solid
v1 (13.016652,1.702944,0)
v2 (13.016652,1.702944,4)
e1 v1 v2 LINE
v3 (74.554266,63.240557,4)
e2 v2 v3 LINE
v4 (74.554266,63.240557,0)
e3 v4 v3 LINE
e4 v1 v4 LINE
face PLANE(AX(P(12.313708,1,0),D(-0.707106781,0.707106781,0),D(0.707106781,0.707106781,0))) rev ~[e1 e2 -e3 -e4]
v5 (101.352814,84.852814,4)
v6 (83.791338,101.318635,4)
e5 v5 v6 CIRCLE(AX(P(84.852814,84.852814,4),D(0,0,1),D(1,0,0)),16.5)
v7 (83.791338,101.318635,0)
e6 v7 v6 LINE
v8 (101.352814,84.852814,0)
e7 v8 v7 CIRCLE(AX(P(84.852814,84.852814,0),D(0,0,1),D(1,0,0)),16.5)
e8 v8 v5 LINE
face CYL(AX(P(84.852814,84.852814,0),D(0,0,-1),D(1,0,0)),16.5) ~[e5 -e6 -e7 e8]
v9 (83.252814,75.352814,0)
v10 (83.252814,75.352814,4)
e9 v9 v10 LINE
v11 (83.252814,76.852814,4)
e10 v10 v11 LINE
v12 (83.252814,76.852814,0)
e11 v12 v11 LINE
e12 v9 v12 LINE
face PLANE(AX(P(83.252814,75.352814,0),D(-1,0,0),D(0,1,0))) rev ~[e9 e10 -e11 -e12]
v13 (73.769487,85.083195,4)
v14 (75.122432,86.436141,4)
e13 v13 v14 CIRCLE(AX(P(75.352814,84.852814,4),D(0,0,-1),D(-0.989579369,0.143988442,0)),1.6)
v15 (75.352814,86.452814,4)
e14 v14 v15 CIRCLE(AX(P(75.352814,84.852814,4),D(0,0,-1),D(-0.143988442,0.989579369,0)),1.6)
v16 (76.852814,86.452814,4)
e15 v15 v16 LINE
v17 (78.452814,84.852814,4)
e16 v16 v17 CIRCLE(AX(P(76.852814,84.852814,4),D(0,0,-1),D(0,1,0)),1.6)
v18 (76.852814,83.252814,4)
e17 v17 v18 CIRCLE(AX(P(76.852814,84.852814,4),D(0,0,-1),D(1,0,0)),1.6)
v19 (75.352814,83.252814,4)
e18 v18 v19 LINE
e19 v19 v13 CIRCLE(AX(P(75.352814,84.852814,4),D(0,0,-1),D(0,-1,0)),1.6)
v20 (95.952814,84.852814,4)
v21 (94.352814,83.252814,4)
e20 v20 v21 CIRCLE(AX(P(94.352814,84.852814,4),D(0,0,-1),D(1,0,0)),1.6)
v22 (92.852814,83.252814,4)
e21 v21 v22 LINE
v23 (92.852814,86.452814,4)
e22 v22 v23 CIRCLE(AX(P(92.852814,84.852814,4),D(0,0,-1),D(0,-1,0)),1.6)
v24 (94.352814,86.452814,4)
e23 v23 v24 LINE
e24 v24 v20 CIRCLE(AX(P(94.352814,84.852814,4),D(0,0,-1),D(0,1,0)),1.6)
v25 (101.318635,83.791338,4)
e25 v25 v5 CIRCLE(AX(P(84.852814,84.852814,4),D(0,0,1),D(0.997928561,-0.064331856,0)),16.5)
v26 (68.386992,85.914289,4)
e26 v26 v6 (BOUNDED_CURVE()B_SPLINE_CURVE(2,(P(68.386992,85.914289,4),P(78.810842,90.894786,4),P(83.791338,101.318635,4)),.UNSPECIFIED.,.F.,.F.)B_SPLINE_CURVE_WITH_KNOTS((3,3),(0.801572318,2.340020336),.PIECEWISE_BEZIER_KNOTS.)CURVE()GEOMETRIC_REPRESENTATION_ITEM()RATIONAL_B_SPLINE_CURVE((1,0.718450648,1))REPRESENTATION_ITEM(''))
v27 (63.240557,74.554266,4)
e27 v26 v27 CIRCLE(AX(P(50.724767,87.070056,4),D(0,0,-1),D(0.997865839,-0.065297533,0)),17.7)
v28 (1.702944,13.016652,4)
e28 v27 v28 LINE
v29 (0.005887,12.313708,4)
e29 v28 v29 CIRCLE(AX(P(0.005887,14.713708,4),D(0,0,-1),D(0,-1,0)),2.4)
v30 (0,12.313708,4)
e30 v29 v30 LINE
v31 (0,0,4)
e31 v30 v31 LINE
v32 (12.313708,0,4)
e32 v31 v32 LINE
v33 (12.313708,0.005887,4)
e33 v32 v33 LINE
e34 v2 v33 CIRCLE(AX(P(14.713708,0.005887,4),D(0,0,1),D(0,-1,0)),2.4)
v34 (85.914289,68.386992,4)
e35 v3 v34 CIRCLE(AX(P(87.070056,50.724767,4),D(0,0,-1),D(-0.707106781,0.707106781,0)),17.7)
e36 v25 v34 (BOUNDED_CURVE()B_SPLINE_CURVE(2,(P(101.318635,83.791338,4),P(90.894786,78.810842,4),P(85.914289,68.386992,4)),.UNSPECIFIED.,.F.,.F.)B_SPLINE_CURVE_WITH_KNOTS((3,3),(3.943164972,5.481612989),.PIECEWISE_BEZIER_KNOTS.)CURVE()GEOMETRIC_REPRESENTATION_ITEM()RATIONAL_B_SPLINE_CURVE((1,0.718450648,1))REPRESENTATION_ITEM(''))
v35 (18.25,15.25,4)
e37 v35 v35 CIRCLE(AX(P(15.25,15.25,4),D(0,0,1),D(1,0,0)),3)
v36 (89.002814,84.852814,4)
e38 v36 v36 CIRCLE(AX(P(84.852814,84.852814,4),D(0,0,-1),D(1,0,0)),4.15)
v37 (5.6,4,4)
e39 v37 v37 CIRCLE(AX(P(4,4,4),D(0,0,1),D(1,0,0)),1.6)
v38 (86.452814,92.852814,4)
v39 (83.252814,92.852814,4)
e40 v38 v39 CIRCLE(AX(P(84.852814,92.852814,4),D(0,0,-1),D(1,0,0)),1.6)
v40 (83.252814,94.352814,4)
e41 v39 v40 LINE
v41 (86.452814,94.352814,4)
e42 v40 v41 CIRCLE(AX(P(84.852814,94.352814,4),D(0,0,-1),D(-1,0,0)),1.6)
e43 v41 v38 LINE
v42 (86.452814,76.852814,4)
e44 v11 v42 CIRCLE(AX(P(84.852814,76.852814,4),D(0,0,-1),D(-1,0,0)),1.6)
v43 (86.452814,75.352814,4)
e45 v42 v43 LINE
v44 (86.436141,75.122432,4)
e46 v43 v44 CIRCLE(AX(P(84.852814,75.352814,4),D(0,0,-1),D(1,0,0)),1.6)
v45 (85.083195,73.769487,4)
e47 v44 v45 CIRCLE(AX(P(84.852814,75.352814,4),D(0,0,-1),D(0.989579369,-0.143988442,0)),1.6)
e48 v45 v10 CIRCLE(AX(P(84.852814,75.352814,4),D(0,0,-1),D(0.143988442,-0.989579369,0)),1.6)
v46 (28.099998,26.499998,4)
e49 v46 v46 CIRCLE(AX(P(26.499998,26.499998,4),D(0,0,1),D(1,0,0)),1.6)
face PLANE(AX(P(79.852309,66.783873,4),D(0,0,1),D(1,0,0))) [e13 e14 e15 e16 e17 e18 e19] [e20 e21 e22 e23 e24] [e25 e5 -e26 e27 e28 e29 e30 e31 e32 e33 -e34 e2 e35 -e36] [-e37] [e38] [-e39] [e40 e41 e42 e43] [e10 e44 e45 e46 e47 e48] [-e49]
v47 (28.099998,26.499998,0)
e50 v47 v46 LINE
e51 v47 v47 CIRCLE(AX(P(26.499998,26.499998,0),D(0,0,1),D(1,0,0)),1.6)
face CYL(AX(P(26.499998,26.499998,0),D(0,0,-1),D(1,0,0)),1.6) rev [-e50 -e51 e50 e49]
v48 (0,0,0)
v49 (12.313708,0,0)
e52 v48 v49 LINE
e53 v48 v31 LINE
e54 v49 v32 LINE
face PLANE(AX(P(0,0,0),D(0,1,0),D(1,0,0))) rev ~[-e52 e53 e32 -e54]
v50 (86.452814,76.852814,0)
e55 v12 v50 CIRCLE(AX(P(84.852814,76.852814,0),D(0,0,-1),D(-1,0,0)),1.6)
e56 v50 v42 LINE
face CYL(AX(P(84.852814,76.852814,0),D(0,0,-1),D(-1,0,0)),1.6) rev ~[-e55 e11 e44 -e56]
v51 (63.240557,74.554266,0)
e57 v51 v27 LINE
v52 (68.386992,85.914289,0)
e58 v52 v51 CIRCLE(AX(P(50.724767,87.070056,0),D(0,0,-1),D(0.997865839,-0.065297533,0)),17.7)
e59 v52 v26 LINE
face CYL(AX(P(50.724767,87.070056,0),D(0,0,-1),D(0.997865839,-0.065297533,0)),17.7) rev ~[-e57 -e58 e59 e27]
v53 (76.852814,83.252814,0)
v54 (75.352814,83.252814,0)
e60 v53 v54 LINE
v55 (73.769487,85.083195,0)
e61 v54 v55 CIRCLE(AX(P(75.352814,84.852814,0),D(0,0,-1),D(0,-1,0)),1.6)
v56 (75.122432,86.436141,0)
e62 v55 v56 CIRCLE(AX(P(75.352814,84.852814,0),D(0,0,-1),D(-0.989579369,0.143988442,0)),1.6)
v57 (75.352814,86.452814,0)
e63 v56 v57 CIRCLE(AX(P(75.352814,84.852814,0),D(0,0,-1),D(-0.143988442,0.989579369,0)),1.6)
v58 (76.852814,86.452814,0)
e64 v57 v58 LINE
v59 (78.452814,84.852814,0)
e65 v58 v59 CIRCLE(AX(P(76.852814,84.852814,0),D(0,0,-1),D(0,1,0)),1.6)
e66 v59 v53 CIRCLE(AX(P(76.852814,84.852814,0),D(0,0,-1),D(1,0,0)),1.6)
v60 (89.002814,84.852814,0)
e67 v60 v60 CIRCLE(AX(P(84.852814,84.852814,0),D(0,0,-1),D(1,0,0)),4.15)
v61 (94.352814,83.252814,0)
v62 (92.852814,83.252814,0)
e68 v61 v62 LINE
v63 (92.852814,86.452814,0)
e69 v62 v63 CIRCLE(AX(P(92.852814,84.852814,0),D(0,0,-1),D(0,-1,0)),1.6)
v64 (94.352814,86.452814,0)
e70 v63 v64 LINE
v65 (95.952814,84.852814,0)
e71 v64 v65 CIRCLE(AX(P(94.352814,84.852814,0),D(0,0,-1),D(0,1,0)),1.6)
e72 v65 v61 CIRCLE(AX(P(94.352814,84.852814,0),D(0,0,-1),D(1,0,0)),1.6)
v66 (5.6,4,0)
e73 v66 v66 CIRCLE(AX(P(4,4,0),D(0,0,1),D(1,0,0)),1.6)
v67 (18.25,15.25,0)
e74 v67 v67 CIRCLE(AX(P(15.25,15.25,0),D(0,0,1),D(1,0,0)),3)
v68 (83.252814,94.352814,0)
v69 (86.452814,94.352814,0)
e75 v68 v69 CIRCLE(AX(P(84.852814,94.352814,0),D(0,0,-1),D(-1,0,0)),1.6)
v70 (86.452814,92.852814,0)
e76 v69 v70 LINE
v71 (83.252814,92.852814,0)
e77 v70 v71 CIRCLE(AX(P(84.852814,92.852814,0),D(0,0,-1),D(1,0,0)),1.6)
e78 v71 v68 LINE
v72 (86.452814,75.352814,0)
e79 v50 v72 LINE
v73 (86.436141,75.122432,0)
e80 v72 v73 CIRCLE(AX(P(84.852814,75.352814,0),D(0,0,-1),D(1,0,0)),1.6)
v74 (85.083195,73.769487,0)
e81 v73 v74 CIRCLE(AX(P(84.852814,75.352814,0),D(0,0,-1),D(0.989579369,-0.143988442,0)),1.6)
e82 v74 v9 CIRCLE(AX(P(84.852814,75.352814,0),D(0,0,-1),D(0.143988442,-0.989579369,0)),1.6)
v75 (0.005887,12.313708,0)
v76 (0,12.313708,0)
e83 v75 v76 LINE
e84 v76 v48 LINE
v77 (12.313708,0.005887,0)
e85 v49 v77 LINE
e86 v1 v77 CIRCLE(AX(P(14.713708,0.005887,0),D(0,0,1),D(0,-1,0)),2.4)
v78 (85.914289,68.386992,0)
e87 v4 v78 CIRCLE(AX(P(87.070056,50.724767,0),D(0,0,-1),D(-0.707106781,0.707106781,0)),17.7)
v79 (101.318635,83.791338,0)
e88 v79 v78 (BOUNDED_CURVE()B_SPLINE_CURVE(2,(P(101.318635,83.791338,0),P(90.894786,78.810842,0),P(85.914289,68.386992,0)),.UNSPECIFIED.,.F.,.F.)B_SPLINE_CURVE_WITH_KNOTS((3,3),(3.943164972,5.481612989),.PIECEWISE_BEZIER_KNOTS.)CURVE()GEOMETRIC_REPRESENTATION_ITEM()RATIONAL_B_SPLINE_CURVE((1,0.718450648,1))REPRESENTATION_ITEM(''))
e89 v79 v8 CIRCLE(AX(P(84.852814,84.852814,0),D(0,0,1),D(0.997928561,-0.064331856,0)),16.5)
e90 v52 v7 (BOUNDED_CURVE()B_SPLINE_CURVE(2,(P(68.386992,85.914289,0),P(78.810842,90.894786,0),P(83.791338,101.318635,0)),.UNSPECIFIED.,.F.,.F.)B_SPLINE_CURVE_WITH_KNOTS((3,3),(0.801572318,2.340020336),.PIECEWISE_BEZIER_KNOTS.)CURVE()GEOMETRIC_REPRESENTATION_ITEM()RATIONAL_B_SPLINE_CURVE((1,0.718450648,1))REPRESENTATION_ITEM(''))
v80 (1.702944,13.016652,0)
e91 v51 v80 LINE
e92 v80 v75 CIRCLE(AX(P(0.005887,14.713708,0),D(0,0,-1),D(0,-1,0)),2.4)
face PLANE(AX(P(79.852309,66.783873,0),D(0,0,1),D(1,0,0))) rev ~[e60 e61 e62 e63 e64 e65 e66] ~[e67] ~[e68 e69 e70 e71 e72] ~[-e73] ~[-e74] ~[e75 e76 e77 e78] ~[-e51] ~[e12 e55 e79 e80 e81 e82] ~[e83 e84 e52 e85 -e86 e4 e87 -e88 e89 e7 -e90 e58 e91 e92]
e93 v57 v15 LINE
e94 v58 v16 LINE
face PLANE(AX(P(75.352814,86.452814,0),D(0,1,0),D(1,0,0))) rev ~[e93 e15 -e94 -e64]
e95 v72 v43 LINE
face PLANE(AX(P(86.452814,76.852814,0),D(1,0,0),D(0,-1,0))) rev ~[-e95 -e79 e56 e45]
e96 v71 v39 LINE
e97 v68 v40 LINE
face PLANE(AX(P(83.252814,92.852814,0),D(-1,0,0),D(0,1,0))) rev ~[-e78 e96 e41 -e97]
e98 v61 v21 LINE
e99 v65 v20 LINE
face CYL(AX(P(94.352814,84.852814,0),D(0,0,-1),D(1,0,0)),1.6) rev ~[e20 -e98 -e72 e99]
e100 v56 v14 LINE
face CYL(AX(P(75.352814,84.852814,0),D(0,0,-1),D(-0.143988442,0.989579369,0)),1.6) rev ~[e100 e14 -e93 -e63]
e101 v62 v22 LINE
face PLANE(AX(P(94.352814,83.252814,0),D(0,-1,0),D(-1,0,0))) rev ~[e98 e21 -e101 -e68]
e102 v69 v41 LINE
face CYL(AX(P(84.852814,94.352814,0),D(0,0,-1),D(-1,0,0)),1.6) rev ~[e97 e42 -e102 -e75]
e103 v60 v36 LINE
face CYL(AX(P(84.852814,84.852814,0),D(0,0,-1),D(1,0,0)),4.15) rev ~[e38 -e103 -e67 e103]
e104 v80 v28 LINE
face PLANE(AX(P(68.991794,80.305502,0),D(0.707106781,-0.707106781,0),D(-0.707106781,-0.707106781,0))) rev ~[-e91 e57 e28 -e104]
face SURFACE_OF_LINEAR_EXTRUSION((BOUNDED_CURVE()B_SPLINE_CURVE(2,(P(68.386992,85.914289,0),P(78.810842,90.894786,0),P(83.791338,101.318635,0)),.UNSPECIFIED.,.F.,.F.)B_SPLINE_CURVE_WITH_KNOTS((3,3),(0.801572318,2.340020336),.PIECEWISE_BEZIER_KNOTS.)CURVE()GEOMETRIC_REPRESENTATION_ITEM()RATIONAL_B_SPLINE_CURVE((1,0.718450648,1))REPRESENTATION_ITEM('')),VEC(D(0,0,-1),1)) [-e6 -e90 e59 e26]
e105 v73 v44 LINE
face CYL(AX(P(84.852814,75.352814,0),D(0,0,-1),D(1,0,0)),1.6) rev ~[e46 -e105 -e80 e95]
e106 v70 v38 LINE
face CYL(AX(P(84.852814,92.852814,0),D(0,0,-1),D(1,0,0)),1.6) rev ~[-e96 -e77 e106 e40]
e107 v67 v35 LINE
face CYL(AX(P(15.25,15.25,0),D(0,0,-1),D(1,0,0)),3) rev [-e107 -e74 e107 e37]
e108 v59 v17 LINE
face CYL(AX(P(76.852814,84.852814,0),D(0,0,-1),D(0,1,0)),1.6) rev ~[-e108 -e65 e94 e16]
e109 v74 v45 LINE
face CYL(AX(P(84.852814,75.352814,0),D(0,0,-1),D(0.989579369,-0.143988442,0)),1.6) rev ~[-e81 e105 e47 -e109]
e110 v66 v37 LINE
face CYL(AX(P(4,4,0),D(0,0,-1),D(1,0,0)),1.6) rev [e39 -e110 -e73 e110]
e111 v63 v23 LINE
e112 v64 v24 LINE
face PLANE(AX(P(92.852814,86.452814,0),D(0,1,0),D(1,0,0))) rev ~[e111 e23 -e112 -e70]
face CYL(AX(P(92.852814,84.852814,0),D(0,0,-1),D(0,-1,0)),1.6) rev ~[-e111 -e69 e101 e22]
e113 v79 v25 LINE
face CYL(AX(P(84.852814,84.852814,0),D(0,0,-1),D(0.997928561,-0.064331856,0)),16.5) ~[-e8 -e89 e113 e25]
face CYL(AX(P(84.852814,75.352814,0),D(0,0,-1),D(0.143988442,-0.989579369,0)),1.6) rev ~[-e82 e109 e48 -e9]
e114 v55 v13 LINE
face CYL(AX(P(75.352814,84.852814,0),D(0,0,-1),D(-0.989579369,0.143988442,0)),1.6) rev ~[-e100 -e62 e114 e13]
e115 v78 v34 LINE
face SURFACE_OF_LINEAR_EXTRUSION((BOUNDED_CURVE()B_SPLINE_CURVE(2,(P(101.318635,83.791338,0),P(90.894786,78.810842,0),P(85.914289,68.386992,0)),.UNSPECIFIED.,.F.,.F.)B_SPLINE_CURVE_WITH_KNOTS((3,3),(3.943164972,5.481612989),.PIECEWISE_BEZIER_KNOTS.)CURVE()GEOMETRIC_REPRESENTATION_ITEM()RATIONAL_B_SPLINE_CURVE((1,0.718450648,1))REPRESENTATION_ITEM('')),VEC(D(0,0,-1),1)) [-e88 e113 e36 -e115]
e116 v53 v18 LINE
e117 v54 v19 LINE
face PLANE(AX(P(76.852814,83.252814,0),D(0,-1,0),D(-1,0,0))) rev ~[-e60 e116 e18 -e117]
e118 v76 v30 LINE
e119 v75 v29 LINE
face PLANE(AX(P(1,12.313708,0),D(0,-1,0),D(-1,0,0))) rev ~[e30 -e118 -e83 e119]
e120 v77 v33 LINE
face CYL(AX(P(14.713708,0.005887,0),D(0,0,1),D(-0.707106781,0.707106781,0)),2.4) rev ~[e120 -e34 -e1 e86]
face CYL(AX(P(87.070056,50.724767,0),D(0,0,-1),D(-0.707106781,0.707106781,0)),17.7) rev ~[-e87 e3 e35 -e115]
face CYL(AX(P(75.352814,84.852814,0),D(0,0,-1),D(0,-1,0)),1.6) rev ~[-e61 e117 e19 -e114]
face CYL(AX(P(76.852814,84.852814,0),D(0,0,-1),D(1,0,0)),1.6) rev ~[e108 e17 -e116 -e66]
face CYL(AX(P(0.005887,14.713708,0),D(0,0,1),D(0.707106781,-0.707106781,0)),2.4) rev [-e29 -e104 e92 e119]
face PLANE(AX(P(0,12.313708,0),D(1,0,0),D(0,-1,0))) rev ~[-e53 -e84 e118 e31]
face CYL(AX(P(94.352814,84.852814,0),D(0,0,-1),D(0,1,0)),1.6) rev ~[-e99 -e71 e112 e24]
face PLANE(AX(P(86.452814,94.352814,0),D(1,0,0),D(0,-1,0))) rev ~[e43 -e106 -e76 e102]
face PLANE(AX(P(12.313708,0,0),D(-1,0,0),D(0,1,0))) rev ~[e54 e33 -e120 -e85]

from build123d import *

# Parameters (mm, degrees)
F0_R        = 1.6
F0_R_2      = 3
F1_DEPTH    = 4
F2_T1_DEPTH = 4
F3_R        = 2.4


# Not quite as in the source:
# - a fillet or chamfer that OpenCascade refuses, or shapes differently, is made with other operations: its cross-section is extruded or revolved along the edge and cut away or added


with BuildPart() as f1:
    # F0 (on Top) → F1 (new body)
    with BuildSketch(Plane.XY):
        with BuildLine():
            ThreePointArc((80.3055021759, 68.9917936769), (73.1855518528, 73.1855518528), (68.9917936769, 80.3055021759))
            Line((68.9917936769, 80.3055021759), (1, 12.313708499))
            Line((1, 12.313708499), (0, 11.313708499))
            Line((0, 11.313708499), (0, 0))
            Line((0, 0), (11.313708499, 0))
            Line((11.313708499, 0), (12.313708499, 1))
            Line((12.313708499, 1), (80.3055021759, 68.9917936769))
        make_face()
        with Locations((4, 4)):
            Circle(F0_R, mode=Mode.SUBTRACT)
        with Locations((15.25, 15.25)):
            Circle(F0_R_2, mode=Mode.SUBTRACT)
        with Locations((26.499998178, 26.499998178)):
            Circle(F0_R, mode=Mode.SUBTRACT)
        with BuildLine():
            ThreePointArc((87.7873068843, 81.9183206005), (81.9183206005, 81.9183206005), (81.9183206005, 87.7873068843))
            Line((81.9183206005, 87.7873068843), (79.1959594929, 90.5096679919))
            Line((79.1959594929, 90.5096679919), (75.1224322345, 86.4361407335))
            ThreePointArc((75.1224322345, 86.4361407335), (75.2373217206, 86.4486400465), (75.3528137424, 86.4528137424))
            Line((75.3528137424, 86.4528137424), (76.8528137424, 86.4528137424))
            ThreePointArc((76.8528137424, 86.4528137424), (77.9841845923, 85.9841845923), (78.4528137424, 84.8528137424))
            ThreePointArc((78.4528137424, 84.8528137424), (77.9841845923, 83.7214428925), (76.8528137424, 83.2528137424))
            Line((76.8528137424, 83.2528137424), (75.3528137424, 83.2528137424))
            ThreePointArc((75.3528137424, 83.2528137424), (74.1427289494, 83.8060593329), (73.7694867513, 85.0831952502))
            Line((73.7694867513, 85.0831952502), (68.9917936769, 80.3055021759))
            ThreePointArc((68.9917936769, 80.3055021759), (73.1855518528, 73.1855518528), (80.3055021759, 68.9917936769))
            Line((80.3055021759, 68.9917936769), (85.0831952502, 73.7694867513))
            ThreePointArc((85.0831952502, 73.7694867513), (83.8060593329, 74.1427289494), (83.2528137424, 75.3528137424))
            Line((83.2528137424, 75.3528137424), (83.2528137424, 76.8528137424))
            ThreePointArc((83.2528137424, 76.8528137424), (84.8528137424, 78.4528137424), (86.4528137424, 76.8528137424))
            Line((86.4528137424, 76.8528137424), (86.4528137424, 75.3528137424))
            ThreePointArc((86.4528137424, 75.3528137424), (86.4486400465, 75.2373217206), (86.4361407335, 75.1224322345))
            Line((86.4361407335, 75.1224322345), (90.5096679919, 79.1959594929))
            Line((90.5096679919, 79.1959594929), (87.7873068843, 81.9183206005))
        make_face()
        with BuildLine():
            Line((79.1959594929, 90.5096679919), (81.9183206005, 87.7873068843))
            ThreePointArc((81.9183206005, 87.7873068843), (86.4409499867, 88.6869138023), (89.0028137424, 84.8528137424))
            ThreePointArc((89.0028137424, 84.8528137424), (88.6869138023, 83.2646774981), (87.7873068843, 81.9183206005))
            Line((87.7873068843, 81.9183206005), (90.5096679919, 79.1959594929))
            Line((90.5096679919, 79.1959594929), (86.4361407335, 75.1224322345))
            ThreePointArc((86.4361407335, 75.1224322345), (85.9841845923, 74.2214428925), (85.0831952502, 73.7694867513))
            Line((85.0831952502, 73.7694867513), (80.3055021759, 68.9917936769))
            ThreePointArc((80.3055021759, 68.9917936769), (83.083856654, 68.4479123157), (85.9142893623, 68.3869924902))
            add(Edge.make_bspline(
                [(101.3186349946, 83.7913381225), (90.8947856118, 78.810841873), (85.9142893623, 68.3869924902)],
                knots=[3.9431649716, 3.9431649716, 3.9431649716, 5.4816129892, 5.4816129892, 5.4816129892], degree=2, weights=[1, 0.7184506482, 1]))
            ThreePointArc((101.3186349946, 83.7913381225), (101.3442668418, 84.321800871), (101.3528137424, 84.8528137424))
            ThreePointArc((101.3528137424, 84.8528137424), (96.1385492583, 96.8895148629), (83.7913381225, 101.3186349946))
            add(Edge.make_bspline(
                [(68.3869924902, 85.9142893623), (78.810841873, 90.8947856118), (83.7913381225, 101.3186349946)],
                knots=[0.801572318, 0.801572318, 0.801572318, 2.3400203356, 2.3400203356, 2.3400203356], degree=2, weights=[1, 0.7184506482, 1]))
            ThreePointArc((68.3869924902, 85.9142893623), (68.4479123157, 83.083856654), (68.9917936769, 80.3055021759))
            Line((68.9917936769, 80.3055021759), (73.7694867513, 85.0831952502))
            ThreePointArc((73.7694867513, 85.0831952502), (74.2214428925, 85.9841845923), (75.1224322345, 86.4361407335))
            Line((75.1224322345, 86.4361407335), (79.1959594929, 90.5096679919))
        make_face()
        with BuildLine():
            ThreePointArc((95.9528137424, 84.8528137424), (95.4841845923, 83.7214428925), (94.3528137424, 83.2528137424))
            Line((94.3528137424, 83.2528137424), (92.8528137424, 83.2528137424))
            ThreePointArc((92.8528137424, 83.2528137424), (91.2528137424, 84.8528137424), (92.8528137424, 86.4528137424))
            Line((92.8528137424, 86.4528137424), (94.3528137424, 86.4528137424))
            ThreePointArc((94.3528137424, 86.4528137424), (95.4841845923, 85.9841845923), (95.9528137424, 84.8528137424))
        make_face(mode=Mode.SUBTRACT)
        with BuildLine():
            Line((83.2528137424, 92.8528137424), (83.2528137424, 94.3528137424))
            ThreePointArc((83.2528137424, 94.3528137424), (84.8528137424, 95.9528137424), (86.4528137424, 94.3528137424))
            Line((86.4528137424, 94.3528137424), (86.4528137424, 92.8528137424))
            ThreePointArc((86.4528137424, 92.8528137424), (84.8528137424, 91.2528137424), (83.2528137424, 92.8528137424))
        make_face(mode=Mode.SUBTRACT)
        Polygon((12.313708499, 0), (12.313708499, 1), (11.313708499, 0), align=None)
        Polygon((0, 11.313708499), (1, 12.313708499), (0, 12.313708499), align=None)
    extrude(amount=F1_DEPTH)

    # F2: fillet of radius 17.7 on 2 edges, made by hand

    # F2_s2 → F2_t1 (join)
    with BuildSketch(Plane.XY):
        with BuildLine():
            ThreePointArc((74.55426567, 63.240557171), (79.7659943294, 66.8474433344), (85.9142893623, 68.3869924902))
            ThreePointArc((85.9142893623, 68.3869924902), (83.083856654, 68.4479123157), (80.3055021759, 68.9917936769))
            Line((80.3055021759, 68.9917936769), (74.55426567, 63.240557171))
        make_face()
        with BuildLine():
            ThreePointArc((68.3869924902, 85.9142893623), (66.8474433344, 79.7659943294), (63.240557171, 74.55426567))
            Line((63.240557171, 74.55426567), (68.9917936769, 80.3055021759))
            ThreePointArc((68.9917936769, 80.3055021759), (68.4479123157, 83.083856654), (68.3869924902, 85.9142893623))
        make_face()
    extrude(amount=F2_T1_DEPTH)

    # F3
    f3_edges = [f1.edges().sort_by_distance(p)[0] for p in [
        (12.313708, 1, 2),
        (1, 12.313708, 2),
    ]]
    fillet(f3_edges, radius=F3_R)


solid = f1.part
